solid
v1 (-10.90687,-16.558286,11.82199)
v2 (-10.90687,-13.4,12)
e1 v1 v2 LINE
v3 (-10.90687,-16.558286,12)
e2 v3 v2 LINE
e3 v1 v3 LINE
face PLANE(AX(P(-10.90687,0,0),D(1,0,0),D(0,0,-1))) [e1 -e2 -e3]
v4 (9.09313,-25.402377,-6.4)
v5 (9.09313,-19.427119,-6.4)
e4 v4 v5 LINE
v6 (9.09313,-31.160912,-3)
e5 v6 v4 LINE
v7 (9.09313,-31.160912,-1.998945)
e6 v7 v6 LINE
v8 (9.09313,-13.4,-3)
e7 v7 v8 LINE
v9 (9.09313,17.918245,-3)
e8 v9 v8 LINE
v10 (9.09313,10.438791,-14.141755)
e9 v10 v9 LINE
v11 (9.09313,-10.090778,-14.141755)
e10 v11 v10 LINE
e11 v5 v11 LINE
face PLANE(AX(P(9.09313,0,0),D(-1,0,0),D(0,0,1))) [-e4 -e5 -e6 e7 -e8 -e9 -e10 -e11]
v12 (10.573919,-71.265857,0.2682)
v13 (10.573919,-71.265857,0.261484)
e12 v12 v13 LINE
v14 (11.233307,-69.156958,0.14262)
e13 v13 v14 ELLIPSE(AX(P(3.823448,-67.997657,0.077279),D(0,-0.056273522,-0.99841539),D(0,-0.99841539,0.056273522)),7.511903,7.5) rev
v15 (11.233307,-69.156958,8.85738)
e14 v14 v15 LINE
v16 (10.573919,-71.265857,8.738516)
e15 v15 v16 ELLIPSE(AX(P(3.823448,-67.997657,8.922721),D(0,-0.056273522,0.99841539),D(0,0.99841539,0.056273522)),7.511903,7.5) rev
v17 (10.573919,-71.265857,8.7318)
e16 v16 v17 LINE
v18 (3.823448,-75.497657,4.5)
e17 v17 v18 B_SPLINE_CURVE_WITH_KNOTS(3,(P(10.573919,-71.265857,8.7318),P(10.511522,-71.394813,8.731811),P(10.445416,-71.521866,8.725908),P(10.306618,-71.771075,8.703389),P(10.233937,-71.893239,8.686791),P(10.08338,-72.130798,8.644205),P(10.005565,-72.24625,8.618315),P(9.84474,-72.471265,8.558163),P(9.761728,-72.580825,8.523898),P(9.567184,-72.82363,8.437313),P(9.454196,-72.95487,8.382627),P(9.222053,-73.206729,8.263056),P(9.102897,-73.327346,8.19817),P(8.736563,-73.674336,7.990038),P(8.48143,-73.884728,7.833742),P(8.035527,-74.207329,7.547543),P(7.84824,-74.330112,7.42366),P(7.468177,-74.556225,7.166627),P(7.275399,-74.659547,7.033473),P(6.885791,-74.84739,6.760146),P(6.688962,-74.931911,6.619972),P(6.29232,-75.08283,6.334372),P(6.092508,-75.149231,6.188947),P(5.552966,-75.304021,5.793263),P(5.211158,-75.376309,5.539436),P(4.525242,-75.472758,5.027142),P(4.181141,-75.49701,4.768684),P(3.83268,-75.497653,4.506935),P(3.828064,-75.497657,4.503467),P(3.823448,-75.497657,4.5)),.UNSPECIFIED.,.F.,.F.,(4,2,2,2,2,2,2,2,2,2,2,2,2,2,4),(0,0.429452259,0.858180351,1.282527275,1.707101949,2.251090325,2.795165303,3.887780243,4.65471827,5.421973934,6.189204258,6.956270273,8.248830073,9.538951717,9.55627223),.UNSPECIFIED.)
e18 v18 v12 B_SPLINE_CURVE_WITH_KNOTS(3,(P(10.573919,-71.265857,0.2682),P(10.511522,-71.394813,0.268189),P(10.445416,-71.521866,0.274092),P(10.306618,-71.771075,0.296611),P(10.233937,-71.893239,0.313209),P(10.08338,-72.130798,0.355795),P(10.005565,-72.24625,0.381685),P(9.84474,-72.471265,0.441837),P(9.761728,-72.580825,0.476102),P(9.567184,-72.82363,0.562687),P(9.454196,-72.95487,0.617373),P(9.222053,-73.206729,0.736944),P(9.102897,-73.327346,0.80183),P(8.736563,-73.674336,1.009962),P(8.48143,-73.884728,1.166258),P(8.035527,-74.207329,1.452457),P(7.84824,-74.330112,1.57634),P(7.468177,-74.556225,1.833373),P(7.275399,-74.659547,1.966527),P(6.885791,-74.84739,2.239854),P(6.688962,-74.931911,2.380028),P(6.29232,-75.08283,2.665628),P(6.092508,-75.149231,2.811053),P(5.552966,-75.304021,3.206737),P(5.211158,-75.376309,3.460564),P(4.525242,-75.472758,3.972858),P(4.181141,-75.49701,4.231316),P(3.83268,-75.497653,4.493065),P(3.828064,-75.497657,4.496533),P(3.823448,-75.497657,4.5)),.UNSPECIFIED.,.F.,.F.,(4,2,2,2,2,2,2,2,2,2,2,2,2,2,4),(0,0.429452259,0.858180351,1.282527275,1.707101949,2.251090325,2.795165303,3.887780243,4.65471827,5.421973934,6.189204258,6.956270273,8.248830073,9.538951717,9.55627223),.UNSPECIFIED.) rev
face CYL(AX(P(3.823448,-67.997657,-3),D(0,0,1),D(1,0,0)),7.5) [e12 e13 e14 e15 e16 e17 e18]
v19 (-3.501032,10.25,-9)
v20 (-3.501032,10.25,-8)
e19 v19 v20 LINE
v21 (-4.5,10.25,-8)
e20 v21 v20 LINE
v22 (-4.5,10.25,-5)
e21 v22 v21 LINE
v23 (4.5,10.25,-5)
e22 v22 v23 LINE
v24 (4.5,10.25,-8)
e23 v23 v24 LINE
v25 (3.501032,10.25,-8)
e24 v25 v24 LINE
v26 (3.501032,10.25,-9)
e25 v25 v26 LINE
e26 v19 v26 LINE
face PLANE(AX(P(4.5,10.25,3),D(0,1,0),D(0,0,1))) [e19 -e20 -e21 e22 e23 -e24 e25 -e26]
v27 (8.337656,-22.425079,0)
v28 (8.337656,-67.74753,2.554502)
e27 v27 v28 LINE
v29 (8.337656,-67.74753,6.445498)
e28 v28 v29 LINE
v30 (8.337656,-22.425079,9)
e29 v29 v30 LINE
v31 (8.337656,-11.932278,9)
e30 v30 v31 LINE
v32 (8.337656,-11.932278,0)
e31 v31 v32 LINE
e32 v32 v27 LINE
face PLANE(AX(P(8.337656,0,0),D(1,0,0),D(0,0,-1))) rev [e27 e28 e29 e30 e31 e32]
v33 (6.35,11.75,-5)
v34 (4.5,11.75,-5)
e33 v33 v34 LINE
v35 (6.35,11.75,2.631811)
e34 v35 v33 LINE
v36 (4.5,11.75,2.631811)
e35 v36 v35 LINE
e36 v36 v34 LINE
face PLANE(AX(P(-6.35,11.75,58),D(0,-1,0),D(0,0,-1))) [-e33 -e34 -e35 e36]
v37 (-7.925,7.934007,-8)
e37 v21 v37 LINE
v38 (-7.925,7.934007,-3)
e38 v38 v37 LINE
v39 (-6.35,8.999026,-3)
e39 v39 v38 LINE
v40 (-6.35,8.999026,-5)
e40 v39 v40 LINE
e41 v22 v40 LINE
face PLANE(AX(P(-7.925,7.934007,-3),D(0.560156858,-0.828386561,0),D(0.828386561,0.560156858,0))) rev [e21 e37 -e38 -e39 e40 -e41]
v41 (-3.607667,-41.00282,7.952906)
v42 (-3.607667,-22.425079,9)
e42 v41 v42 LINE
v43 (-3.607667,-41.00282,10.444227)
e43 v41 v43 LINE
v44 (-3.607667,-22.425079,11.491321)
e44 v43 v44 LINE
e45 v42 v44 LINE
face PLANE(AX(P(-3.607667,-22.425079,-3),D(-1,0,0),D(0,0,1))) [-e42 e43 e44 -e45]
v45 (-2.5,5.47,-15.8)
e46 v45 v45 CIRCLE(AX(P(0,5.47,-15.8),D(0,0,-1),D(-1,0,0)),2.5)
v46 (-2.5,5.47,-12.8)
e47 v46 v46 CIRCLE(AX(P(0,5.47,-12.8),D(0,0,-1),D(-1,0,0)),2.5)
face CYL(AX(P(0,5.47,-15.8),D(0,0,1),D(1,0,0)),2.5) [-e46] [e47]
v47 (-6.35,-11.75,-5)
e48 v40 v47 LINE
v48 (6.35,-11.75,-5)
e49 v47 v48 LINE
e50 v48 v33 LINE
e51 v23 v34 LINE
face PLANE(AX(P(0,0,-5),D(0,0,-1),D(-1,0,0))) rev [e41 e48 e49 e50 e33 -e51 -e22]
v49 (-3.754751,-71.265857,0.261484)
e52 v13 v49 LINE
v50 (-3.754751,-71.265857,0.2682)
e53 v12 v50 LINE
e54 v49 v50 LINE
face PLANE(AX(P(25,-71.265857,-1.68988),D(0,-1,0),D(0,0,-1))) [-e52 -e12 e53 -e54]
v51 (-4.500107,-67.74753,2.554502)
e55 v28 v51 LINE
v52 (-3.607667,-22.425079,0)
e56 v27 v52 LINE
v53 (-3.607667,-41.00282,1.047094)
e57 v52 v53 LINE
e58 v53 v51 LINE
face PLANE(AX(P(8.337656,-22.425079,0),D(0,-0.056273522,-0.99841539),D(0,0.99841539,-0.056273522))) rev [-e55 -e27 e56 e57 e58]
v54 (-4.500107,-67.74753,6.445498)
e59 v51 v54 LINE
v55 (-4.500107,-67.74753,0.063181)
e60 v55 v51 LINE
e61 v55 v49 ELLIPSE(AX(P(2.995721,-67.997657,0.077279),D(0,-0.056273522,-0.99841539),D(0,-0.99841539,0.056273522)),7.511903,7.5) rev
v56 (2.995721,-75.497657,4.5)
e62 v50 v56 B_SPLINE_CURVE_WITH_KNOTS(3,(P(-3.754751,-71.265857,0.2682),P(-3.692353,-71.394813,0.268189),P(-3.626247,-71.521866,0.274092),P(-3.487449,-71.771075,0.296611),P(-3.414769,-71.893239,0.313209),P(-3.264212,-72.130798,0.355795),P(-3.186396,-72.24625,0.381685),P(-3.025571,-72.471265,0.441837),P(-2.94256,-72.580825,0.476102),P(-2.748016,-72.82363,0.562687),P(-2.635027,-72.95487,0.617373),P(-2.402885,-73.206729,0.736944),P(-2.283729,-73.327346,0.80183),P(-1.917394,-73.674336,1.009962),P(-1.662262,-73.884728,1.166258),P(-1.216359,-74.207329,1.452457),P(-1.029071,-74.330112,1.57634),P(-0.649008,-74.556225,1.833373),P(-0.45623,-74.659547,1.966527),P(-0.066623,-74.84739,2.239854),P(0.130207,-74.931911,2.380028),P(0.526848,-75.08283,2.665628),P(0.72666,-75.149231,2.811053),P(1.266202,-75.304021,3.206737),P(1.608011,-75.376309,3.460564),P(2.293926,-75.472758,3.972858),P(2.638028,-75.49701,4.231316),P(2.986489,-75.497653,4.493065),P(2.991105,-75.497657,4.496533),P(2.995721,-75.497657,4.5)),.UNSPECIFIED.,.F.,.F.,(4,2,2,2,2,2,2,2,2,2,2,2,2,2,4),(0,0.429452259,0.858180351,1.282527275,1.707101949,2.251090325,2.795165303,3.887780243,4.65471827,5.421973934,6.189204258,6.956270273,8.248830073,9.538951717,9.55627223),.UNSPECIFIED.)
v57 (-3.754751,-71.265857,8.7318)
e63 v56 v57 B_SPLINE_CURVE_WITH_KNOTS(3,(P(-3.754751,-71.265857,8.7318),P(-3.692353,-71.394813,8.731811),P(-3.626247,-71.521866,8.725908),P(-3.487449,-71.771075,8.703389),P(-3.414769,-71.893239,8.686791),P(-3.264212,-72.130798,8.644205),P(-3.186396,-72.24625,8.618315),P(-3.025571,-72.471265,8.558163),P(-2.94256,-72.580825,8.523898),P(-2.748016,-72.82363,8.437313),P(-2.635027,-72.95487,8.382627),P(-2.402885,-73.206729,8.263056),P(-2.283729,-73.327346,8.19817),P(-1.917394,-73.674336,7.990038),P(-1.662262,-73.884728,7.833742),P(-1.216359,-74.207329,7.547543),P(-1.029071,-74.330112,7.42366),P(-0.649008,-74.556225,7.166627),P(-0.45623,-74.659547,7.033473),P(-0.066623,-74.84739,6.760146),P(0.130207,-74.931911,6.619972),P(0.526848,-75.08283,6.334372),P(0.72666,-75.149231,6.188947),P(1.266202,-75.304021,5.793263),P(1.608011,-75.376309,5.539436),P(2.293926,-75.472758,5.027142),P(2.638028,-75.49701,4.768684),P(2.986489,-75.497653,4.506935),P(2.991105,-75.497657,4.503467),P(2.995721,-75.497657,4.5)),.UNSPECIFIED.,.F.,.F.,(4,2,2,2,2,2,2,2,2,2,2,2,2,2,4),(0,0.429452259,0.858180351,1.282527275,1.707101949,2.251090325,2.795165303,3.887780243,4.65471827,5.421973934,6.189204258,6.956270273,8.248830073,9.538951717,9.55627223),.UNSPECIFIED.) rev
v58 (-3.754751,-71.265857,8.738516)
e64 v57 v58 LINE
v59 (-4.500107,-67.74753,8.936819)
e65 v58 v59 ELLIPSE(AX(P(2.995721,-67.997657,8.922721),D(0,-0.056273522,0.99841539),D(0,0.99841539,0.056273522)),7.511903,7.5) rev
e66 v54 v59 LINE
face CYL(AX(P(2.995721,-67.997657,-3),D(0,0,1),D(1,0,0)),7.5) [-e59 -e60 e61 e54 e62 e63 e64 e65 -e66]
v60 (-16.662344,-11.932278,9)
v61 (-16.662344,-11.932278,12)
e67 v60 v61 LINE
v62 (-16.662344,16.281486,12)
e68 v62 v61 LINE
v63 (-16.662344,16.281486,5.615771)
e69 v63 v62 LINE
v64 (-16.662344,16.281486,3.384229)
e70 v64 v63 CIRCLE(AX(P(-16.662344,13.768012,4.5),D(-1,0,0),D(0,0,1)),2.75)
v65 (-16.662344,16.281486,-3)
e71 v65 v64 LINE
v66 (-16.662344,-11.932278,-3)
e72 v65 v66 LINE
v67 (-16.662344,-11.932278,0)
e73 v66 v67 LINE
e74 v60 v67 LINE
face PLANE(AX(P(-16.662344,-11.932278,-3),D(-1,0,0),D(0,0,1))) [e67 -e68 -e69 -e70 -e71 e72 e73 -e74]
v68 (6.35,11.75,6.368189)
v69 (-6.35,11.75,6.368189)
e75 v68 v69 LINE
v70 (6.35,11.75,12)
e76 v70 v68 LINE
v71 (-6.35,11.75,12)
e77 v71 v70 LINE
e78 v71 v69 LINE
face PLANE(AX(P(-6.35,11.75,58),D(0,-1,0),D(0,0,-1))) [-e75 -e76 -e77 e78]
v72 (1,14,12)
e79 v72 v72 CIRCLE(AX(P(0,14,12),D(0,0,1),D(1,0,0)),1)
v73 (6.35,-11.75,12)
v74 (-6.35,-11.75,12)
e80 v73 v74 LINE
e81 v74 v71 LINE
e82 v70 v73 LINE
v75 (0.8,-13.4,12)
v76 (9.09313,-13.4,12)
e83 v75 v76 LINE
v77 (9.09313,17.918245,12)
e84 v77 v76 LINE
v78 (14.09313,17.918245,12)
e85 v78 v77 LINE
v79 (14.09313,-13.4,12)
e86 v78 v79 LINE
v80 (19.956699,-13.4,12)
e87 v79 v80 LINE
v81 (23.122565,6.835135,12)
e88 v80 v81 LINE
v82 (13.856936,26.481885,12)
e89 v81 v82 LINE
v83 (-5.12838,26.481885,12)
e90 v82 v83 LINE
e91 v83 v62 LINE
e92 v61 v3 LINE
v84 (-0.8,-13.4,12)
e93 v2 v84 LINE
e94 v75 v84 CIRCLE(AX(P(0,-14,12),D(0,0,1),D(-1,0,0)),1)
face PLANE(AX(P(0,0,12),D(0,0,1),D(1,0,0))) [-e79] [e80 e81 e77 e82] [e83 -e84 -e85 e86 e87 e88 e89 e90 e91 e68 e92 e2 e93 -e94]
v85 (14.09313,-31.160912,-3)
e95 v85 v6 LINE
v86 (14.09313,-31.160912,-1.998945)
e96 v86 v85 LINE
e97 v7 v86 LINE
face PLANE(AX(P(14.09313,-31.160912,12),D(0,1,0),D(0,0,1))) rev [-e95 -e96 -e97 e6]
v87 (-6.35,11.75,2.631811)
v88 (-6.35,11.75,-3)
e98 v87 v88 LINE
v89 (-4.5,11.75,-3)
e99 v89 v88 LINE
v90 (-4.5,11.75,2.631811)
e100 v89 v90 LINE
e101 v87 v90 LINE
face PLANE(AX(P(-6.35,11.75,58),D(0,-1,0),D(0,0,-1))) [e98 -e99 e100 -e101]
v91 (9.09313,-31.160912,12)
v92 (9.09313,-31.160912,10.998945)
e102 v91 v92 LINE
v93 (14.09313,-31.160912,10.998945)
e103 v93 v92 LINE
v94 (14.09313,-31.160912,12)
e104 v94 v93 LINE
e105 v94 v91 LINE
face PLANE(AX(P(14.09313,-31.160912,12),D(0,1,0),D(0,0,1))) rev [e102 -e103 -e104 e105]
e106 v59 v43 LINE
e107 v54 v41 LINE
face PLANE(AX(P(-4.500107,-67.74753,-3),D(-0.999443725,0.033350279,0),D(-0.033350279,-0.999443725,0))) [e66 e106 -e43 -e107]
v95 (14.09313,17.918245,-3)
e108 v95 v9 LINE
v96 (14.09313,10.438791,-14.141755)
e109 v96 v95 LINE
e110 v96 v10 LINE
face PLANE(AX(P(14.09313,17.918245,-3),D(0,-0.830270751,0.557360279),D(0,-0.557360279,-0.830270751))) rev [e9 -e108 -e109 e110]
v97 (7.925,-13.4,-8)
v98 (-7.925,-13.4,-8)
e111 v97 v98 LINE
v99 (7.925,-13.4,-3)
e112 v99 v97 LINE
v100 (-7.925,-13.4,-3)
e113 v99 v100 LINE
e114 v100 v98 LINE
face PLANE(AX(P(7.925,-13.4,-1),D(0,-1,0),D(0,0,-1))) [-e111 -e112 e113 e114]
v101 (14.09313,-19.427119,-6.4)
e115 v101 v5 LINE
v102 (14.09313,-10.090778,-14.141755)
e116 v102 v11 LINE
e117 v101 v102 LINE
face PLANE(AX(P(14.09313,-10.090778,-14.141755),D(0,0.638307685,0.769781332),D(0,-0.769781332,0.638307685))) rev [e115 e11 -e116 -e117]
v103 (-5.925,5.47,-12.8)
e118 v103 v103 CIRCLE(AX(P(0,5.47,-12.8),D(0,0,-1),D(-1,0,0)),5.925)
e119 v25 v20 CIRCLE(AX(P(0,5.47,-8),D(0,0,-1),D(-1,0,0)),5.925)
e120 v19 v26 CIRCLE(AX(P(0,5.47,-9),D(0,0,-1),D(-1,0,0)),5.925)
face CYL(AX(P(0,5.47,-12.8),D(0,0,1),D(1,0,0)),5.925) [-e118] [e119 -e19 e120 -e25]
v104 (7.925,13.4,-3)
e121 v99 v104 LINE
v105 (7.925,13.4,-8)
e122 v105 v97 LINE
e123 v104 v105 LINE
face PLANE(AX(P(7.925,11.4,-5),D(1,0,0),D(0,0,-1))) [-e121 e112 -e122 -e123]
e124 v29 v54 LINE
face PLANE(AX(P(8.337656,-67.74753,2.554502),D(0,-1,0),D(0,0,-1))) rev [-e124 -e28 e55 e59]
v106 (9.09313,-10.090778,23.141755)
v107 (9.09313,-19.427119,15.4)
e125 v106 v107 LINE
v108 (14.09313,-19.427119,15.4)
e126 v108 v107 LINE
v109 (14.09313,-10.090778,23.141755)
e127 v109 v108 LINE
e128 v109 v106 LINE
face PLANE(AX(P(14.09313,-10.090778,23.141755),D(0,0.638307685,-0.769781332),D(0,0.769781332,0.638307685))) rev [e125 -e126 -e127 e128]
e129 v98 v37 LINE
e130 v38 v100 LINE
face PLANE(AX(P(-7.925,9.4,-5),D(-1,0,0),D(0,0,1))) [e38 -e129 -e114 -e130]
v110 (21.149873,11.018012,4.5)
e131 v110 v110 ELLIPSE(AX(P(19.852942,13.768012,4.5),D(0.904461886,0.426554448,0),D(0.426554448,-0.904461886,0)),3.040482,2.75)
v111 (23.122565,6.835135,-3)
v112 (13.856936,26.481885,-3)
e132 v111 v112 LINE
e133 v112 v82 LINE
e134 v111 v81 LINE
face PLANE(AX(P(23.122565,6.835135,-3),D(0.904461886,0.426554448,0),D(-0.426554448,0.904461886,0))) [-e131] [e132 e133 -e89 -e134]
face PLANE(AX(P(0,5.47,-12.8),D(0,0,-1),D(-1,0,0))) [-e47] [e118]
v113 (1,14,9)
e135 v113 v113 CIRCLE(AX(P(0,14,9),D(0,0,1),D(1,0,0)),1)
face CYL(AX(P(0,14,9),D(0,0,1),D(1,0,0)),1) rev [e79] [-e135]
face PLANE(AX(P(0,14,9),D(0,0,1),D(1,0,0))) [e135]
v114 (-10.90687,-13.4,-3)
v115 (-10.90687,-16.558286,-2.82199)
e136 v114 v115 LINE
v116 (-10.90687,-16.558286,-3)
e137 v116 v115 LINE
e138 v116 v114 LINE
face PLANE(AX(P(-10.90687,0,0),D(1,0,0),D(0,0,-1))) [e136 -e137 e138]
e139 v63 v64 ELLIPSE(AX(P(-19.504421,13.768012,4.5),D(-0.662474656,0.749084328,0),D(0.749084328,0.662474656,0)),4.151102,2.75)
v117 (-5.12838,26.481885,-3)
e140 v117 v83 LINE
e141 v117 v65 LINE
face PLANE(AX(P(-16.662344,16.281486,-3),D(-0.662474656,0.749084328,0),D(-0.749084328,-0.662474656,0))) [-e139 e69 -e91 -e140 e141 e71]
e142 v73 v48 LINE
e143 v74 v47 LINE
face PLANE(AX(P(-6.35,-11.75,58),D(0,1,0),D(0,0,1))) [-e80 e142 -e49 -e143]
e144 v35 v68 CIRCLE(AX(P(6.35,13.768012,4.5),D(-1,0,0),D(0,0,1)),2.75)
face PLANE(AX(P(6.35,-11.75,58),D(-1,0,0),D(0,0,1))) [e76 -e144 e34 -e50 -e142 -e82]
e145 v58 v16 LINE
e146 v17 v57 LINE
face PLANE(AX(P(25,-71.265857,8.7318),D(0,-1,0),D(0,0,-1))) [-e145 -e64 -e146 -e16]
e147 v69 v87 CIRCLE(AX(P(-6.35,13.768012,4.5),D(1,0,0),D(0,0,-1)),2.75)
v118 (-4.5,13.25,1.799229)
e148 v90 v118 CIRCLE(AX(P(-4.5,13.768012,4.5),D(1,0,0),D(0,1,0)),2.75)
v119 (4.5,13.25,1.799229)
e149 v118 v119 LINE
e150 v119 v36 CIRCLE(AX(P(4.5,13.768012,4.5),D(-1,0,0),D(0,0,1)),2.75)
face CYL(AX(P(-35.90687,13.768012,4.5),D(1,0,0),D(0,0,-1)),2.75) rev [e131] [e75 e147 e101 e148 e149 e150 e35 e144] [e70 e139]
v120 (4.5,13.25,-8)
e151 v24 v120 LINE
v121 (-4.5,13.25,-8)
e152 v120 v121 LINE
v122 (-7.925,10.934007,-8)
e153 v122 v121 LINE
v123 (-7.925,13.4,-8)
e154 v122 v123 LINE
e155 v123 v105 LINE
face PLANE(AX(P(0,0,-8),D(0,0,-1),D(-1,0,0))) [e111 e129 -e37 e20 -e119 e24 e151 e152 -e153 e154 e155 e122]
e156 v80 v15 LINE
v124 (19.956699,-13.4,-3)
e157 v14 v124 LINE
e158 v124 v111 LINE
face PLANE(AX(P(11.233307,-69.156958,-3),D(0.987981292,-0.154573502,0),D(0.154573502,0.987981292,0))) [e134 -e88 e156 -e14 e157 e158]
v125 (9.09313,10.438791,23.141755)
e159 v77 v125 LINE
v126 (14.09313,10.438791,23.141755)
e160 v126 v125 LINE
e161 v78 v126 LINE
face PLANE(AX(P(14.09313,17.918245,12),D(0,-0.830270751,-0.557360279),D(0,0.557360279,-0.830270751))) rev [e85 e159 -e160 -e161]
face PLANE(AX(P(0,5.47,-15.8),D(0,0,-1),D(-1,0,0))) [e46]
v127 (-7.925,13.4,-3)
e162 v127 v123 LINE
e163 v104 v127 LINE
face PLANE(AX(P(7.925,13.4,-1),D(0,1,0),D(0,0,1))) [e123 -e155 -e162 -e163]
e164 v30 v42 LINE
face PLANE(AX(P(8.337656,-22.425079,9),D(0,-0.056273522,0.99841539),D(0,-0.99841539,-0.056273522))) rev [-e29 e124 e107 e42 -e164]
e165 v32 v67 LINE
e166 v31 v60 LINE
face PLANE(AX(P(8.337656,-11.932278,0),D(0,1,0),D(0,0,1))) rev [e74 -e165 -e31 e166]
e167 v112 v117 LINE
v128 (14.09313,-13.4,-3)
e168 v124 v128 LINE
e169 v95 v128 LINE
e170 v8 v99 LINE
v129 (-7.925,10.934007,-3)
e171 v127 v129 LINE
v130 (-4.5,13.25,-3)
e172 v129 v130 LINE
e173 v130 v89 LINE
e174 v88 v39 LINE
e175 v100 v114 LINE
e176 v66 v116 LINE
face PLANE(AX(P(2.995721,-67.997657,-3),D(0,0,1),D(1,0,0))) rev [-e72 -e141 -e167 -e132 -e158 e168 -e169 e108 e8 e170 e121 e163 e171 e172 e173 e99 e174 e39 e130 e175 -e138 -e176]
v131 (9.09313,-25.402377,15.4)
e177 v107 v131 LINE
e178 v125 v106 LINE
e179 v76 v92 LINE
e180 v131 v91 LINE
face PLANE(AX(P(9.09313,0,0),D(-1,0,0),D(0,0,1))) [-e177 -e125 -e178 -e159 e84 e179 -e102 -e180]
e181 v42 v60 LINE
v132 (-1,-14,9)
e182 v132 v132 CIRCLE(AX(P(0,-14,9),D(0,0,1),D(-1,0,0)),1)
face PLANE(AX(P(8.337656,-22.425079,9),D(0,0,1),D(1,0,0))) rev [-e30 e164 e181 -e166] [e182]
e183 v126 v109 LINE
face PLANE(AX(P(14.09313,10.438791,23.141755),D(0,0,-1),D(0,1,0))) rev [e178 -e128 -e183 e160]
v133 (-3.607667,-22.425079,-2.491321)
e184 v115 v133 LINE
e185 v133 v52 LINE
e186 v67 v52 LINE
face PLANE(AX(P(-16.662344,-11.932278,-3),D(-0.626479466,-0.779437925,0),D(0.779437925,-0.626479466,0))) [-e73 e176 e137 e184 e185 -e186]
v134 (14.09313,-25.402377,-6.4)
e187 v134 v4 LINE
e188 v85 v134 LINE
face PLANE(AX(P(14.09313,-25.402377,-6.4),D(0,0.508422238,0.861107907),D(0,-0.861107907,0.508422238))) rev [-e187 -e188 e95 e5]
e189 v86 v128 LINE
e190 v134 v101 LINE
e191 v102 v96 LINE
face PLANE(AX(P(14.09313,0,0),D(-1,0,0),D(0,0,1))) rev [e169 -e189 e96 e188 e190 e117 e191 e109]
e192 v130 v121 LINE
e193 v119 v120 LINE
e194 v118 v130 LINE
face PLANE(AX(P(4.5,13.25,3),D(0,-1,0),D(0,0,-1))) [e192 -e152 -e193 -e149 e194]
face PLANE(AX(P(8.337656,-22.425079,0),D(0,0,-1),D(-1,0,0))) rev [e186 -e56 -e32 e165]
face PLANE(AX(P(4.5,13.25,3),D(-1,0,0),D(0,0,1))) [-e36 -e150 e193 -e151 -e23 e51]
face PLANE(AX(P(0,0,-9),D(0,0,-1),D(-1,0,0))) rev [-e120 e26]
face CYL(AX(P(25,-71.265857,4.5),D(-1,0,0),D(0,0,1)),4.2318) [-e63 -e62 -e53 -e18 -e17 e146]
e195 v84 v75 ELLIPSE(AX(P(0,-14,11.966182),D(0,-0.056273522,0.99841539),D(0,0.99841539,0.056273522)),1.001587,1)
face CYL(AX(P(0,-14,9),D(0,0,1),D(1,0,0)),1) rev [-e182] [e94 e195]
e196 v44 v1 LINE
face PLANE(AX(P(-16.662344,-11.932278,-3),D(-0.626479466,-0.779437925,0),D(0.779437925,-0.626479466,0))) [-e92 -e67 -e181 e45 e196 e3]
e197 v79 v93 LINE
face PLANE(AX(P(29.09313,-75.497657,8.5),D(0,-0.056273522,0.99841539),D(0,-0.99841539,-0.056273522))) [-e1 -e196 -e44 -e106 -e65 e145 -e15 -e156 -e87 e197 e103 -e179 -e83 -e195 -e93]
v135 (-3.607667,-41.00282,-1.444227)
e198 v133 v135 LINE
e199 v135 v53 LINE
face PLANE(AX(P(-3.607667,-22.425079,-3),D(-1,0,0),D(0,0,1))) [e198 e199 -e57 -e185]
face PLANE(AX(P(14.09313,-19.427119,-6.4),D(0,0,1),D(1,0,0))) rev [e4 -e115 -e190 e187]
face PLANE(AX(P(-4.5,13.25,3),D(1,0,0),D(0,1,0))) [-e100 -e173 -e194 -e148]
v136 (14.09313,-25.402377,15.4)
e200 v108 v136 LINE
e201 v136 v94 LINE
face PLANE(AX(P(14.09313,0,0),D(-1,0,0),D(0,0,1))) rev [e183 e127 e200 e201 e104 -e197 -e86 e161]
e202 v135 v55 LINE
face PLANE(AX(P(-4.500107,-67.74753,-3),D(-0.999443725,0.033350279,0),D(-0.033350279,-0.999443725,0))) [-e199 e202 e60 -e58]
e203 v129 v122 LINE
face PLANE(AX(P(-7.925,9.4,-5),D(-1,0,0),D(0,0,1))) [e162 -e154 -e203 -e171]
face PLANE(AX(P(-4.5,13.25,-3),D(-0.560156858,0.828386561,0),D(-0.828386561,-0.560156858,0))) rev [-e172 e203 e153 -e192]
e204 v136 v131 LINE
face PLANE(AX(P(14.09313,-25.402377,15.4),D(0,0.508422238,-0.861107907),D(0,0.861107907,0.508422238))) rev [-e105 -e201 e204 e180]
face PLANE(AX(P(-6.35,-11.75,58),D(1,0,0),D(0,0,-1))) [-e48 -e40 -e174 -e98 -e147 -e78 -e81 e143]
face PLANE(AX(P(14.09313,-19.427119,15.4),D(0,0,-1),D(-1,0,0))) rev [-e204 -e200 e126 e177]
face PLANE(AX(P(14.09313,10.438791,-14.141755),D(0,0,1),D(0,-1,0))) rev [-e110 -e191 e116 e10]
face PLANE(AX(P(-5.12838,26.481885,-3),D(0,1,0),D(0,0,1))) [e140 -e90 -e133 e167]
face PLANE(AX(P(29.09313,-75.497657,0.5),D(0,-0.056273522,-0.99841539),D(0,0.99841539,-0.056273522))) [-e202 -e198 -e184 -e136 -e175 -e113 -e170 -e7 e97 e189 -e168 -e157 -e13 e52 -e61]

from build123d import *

# Parameters (mm, degrees)
SKETCH1_R                = 15
SKETCH1_W                = 14.5
SKETCH1_H                = 22.8
BOSS_EXTRUDE1_DEPTH      = 12
CUT_EXTRUDE1_DEPTH       = 24
BOSS_EXTRUDE2_START      = -12
BOSS_EXTRUDE2_DEPTH      = 12
FILLET1_R                = 5
FILLET2_R                = 5
BOSS_EXTRUDE4_DEPTH      = 12
BOSS_EXTRUDE7_DEPTH      = 10
SKETCH9_R                = 7.25
BOSS_EXTRUDE9_DEPTH      = 6.6
SKETCH10_R               = 2.5
BOSS_EXTRUDE10_DEPTH     = 3
FILLET3_R                = 10
FILLET5_R                = 10
SKETCH11_W               = 2.40686952
SKETCH11_H               = 3
SKETCH11_W_2             = 3
SKETCH11_H_2             = 2.40686952
CUT_EXTRUDE2_DEPTH       = 10
SKETCH13_W               = 18.18626096
SKETCH13_H               = 26.685750205
BOSS_EXTRUDE11_DEPTH     = 3.6
SKETCH15_W               = 18.18626096
SKETCH15_H               = 26.685750205
SKETCH15_W_2             = 14.5
SKETCH15_H_2             = 22.8
BOSS_EXTRUDE12_DEPTH     = 13.6
SKETCH17_W               = 88.544213988
SKETCH17_H               = 130.772992967
SKETCH17_W_2             = 18.18626096
SKETCH17_H_2             = 26.685750205
CUT_EXTRUDE3_DEPTH       = 13.6
BOSS_EXTRUDE16_DEPTH     = 15
CUT_EXTRUDE6_DEPTH       = 20
CUT_EXTRUDE6_DEPTH_BACK  = 20
BOSS_EXTRUDE17_DEPTH     = 5
CUT_EXTRUDE7_DEPTH       = 25
CUT_EXTRUDE7_DEPTH_BACK  = 15
SKETCH25_W               = 14.18626096
SKETCH25_H               = 22.685750205
CUT_EXTRUDE8_DEPTH       = 20
SKETCH26_R               = 1
CUT_EXTRUDE9_DEPTH       = 3
CUT_EXTRUDE12_DEPTH      = 25
SKETCH29_W               = 13.770233496
SKETCH29_H               = 29.611444499
CUT_EXTRUDE13_DEPTH      = 48
SKETCH30_W               = 12
SKETCH30_H               = 22.8
CUT_EXTRUDE14_DEPTH      = 48
SKETCH32_W               = 2
SKETCH32_H               = 22.8
BOSS_EXTRUDE23_DEPTH     = 17
SKETCH33_W               = 15.85
SKETCH33_H               = 2
BOSS_EXTRUDE24_DEPTH     = 4
SKETCH34_W               = 15.85
SKETCH34_H               = 26.8
BOSS_EXTRUDE25_DEPTH     = 3
SKETCH35_R               = 5.925
BOSS_EXTRUDE26_DEPTH     = 4.8
SKETCH36_R               = 2.5
BOSS_EXTRUDE27_DEPTH     = 3
SKETCH37_W               = 12.7
SKETCH37_H               = 23.5
CUT_EXTRUDE15_DEPTH      = 63
CUT_EXTRUDE16_DEPTH      = 8
CUT_EXTRUDE16_DEPTH_BACK = 4
SKETCH38_W               = 9
SKETCH38_H               = 3
CUT_EXTRUDE17_DEPTH      = 5
CUT_EXTRUDE18_DEPTH      = 31
CUT_EXTRUDE18_DEPTH_BACK = 50
SKETCH40_R               = 2.75


# Read off the part's stored shape, not the designer's step: Boss-Extrude2
with BuildPart() as part:
    # Sketch1 → Boss-Extrude1 (new body)
    # profile 1 of 2: a face of its own
    with BuildSketch(Plane.XY):
        Circle(SKETCH1_R)
        Rectangle(SKETCH1_W, SKETCH1_H, mode=Mode.SUBTRACT)
    # profile 2 of 2: a face of its own
    with BuildSketch(Plane.XY):
        with BuildLine():
            Line((34.889014039, -14.726662295), (10.829823077, 10.378580449))
            ThreePointArc((10.829823077, 10.378580449), (13.918465184, 5.5925242), (15, 0))
            ThreePointArc((15, 0), (8.274705986, -12.511164648), (-5.870565447, -13.803494533))
            Line((-5.870565447, -13.803494533), (11.720818789, -21.285032793))
            Line((11.720818789, -21.285032793), (7.17598603, -56.938690475))
            Line((7.17598603, -56.938690475), (22.17598603, -56.938690475))
            Line((22.17598603, -56.938690475), (34.889014039, -14.726662295))
        make_face()
    extrude(amount=BOSS_EXTRUDE1_DEPTH)

    # Sketch4 → Cut-Extrude1 (cut)
    with BuildSketch(Plane.XY.offset(12)):
        Polygon((25.908479053, -5.355669266), (45.608770936, -16.450233145), (32.401525551, -58.978549805), (15.005502416, -56.938690475), align=None)
    extrude(amount=-CUT_EXTRUDE1_DEPTH, mode=Mode.SUBTRACT)

    # Boss-Extrude2 outline → Boss-Extrude2 (add)
    with BuildSketch(Plane.XY.offset(12).offset(BOSS_EXTRUDE2_START)):
        with BuildLine():
            Line((5.606806504, -22.40394756), (1.154595891, -56.938690475))
            Line((1.154595891, -56.938690475), (7.17598603, -56.938690475))
            Line((7.17598603, -56.938690475), (11.720818789, -21.285032793))
            Line((11.720818789, -21.285032793), (-5.870565447, -13.803494533))
            ThreePointArc((-5.870565447, -13.803494533), (-7.327726293, -13.088331726), (-8.699078631, -12.219903066))
            Line((-8.699078631, -12.219903066), (5.606806504, -22.40394756))
        make_face()
    extrude(amount=BOSS_EXTRUDE2_DEPTH)

    # Fillet1
    fillet1_edges = [part.edges().sort_by_distance(p)[0] for p in [
        (1.154595891, -56.938690475, 6),
    ]]
    fillet(fillet1_edges, radius=FILLET1_R)

    # Fillet2
    fillet2_edges = [part.edges().sort_by_distance(p)[0] for p in [
        (15.005502416, -56.938690475, 6),
    ]]
    fillet(fillet2_edges, radius=FILLET2_R)

    # Sketch5 → Boss-Extrude4 (add)
    with BuildSketch(Plane(origin=(0, 0, 0), x_dir=(-1, 0, 0), z_dir=(0, 0, -1))):
        with BuildLine():
            Line((-2.448312302, -26.293012267), (11.598771509, -16.293204089))
            ThreePointArc((11.598771509, -16.293204089), (15.246223493, 12.944213735), (-14.195603849, 14.088464479))
            Line((-14.195603849, 14.088464479), (-32.784425655, -4.641720828))
            Line((-32.784425655, -4.641720828), (-16.822475194, -80.159229174))
            Line((-16.822475194, -80.159229174), (4.496107211, -80.159229174))
            Line((4.496107211, -80.159229174), (-2.448312302, -26.293012267))
        make_face()
        with BuildLine():
            Line((-25.908479053, -5.355669266), (-10.829823077, 10.378580449))
            ThreePointArc((-10.829823077, 10.378580449), (11.349356029, 9.807758038), (8.699078632, -12.219903067))
            Line((8.699078631, -12.219903066), (-5.606806504, -22.40394756))
            Line((-5.606806504, -22.40394756), (-1.88161409, -51.29938255))
            ThreePointArc((-1.88161409, -51.29938255), (-3.085807921, -55.240467298), (-6.8405742, -56.938690475))
            Line((-6.8405742, -56.938690475), (-10.951869916, -56.938690475))
            ThreePointArc((-10.951869916, -56.938690475), (-14.100682132, -55.822629407), (-15.843787659, -52.972683126))
            Line((-15.843787659, -52.972683126), (-25.908479053, -5.355669266))
        make_face(mode=Mode.SUBTRACT)
    extrude(amount=-BOSS_EXTRUDE4_DEPTH)

    # Sketch6 → Boss-Extrude7 (add)
    with BuildSketch(Plane(origin=(0, 0, 0), x_dir=(-1, 0, 0), z_dir=(0, 0, -1))):
        Polygon((-11.5, 2.65), (-7.25, 2.65), (-7.25, 4.15), (-7.25, 5.65), (-11.5, 5.65), align=None)
        with BuildLine():
            Line((-7.25, 2.65), (-7.09313048, 2.65))
            ThreePointArc((-7.09313048, 2.65), (-7.210675973, 3.395909812), (-7.25, 4.15))
            Line((-7.25, 4.15), (-7.25, 2.65))
        make_face()
        with BuildLine():
            Line((-7.25, 5.65), (-7.25, 4.15))
            ThreePointArc((-7.25, 4.15), (-7.210675973, 4.904090188), (-7.09313048, 5.65))
            Line((-7.09313048, 5.65), (-7.25, 5.65))
        make_face()
        Polygon((0, 11.4), (1.5, 11.4), (1.5, 15.65), (-1.5, 15.65), (-1.5, 11.4), align=None)
        with BuildLine():
            Line((-1.5, 11.4), (-1.5, 11.24313048))
            ThreePointArc((-1.5, 11.24313048), (-0.754090188, 11.360675973), (0, 11.4))
            Line((0, 11.4), (-1.5, 11.4))
        make_face()
        with BuildLine():
            ThreePointArc((0, 11.4), (0.754090188, 11.360675973), (1.5, 11.24313048))
            Line((1.5, 11.24313048), (1.5, 11.4))
            Line((1.5, 11.4), (0, 11.4))
        make_face()
        Polygon((7.25, 4.15), (7.25, 2.65), (11.5, 2.65), (11.5, 5.65), (7.25, 5.65), align=None)
        with BuildLine():
            ThreePointArc((7.09313048, 5.65), (7.210675973, 4.904090188), (7.25, 4.15))
            Line((7.25, 4.15), (7.25, 5.65))
            Line((7.25, 5.65), (7.09313048, 5.65))
        make_face()
        with BuildLine():
            ThreePointArc((7.25, 4.15), (7.210675973, 3.395909812), (7.09313048, 2.65))
            Line((7.09313048, 2.65), (7.25, 2.65))
            Line((7.25, 2.65), (7.25, 4.15))
        make_face()
    extrude(amount=BOSS_EXTRUDE7_DEPTH)

    # Sketch9 → Boss-Extrude9 (add)
    with BuildSketch(Plane(origin=(0, 0, -6.4), x_dir=(-1, 0, 0), z_dir=(0, 0, -1))):
        with Locations(Location((0, 4.15, 0), (0, 0, 168.059456039))):
            Circle(SKETCH9_R)
    extrude(amount=BOSS_EXTRUDE9_DEPTH)

    # Sketch10 → Boss-Extrude10 (add)
    with BuildSketch(Plane(origin=(0, 0, -13), x_dir=(-1, 0, 0), z_dir=(0, 0, -1))):
        with Locations((0, 4.15)):
            Circle(SKETCH10_R)
    extrude(amount=BOSS_EXTRUDE10_DEPTH)

    # Fillet3
    fillet3_edges = [part.edges().sort_by_distance(p)[0] for p in [
        (-4.496107211, -80.159229174, 6),
    ]]
    fillet(fillet3_edges, radius=FILLET3_R)

    # Fillet5
    fillet5_edges = [part.edges().sort_by_distance(p)[0] for p in [
        (16.822475194, -80.159229174, 6),
    ]]
    fillet(fillet5_edges, radius=FILLET5_R)

    # Sketch11 → Cut-Extrude2 (cut)
    with BuildSketch(Plane(origin=(0, 0, -10), x_dir=(-1, 0, 0), z_dir=(0, 0, -1))):
        with Locations((10.29656524, 4.15)):
            Rectangle(SKETCH11_W, SKETCH11_H)
        with Locations((-10.29656524, 4.15)):
            Rectangle(SKETCH11_W, SKETCH11_H)
        with Locations((0, 14.44656524)):
            Rectangle(SKETCH11_W_2, SKETCH11_H_2)
    extrude(amount=-CUT_EXTRUDE2_DEPTH, mode=Mode.SUBTRACT)

    # Sketch13 → Boss-Extrude11 (add)
    with BuildSketch(Plane(origin=(0, 0, -10), x_dir=(-1, 0, 0), z_dir=(0, 0, -1))):
        with Locations((0, -0.057124897)):
            Rectangle(SKETCH13_W, SKETCH13_H)
    extrude(amount=-BOSS_EXTRUDE11_DEPTH)

    # Sketch15 → Boss-Extrude12 (add)
    with BuildSketch(Plane(origin=(0, 0, -10), x_dir=(-1, 0, 0), z_dir=(0, 0, -1))):
        with Locations((0, -0.057124897)):
            Rectangle(SKETCH15_W, SKETCH15_H)
        Rectangle(SKETCH15_W_2, SKETCH15_H_2, mode=Mode.SUBTRACT)
    extrude(amount=-BOSS_EXTRUDE12_DEPTH)

    # Sketch17 → Cut-Extrude3 (cut)
    with BuildSketch(Plane(origin=(0, 0, 0), x_dir=(-1, 0, 0), z_dir=(0, 0, -1))):
        with Locations((-15.076356892, -26.777764381)):
            Rectangle(SKETCH17_W, SKETCH17_H)
        with Locations((0, -0.057124897)):
            Rectangle(SKETCH17_W_2, SKETCH17_H_2, mode=Mode.SUBTRACT)
    extrude(amount=-CUT_EXTRUDE3_DEPTH, mode=Mode.SUBTRACT)

    # Sketch18 → Boss-Extrude16 (add)
    with BuildSketch(Plane.XY.offset(12)):
        with BuildLine():
            Line((11.233307191, -69.15695845), (23.12256473, 6.835135095))
            Line((23.12256473, 6.835135095), (13.856935522, 26.481884794))
            Line((13.856935522, 26.481884794), (-5.128379784, 26.481884794))
            Line((-5.128379784, 26.481884794), (-16.662343589, 16.28148622))
            Line((-16.662343589, 16.28148622), (-16.662343589, -11.932277882))
            Line((-16.662343589, -11.932277882), (-3.607666978, -22.42507862))
            Line((-3.607666978, -22.42507862), (-3.607666978, -41.0028204))
            Line((-3.607666978, -41.0028204), (-4.500106941, -67.747530096))
            ThreePointArc((-4.500106941, -67.747530096), (-2.395287871, -73.211774888), (2.995720994, -75.497657186))
            Line((2.995720994, -75.497657186), (3.823447504, -75.497657186))
            ThreePointArc((3.823447504, -75.497657186), (8.699677632, -73.696111339), (11.233307191, -69.15695845))
        make_face()
    extrude(amount=-BOSS_EXTRUDE16_DEPTH)

    # Sketch22 → Cut-Extrude6 (cut, two sides: drawn at the far end of the back side and taken through both)
    with BuildSketch(Plane(origin=(9.09313048, 0, 0), x_dir=(0, 0, -1), z_dir=(1, 0, 0)).offset(-CUT_EXTRUDE6_DEPTH_BACK)):
        Polygon((-0.5, -75.497657186), (-8.5, -75.497657186), (-12, -13.4), (-17.601804557, -13.4), (-17.601804557, -86.596912876), (8.601804557, -86.596912876), (8.601804557, -13.4), (3, -13.4), align=None)
    extrude(amount=CUT_EXTRUDE6_DEPTH + CUT_EXTRUDE6_DEPTH_BACK, mode=Mode.SUBTRACT)

    # Sketch20 → Boss-Extrude17 (add)
    with BuildSketch(Plane(origin=(9.09313048, 0, 0), x_dir=(0, 0, -1), z_dir=(1, 0, 0))):
        Polygon((3, 17.918244511), (14.141754599, 10.438791043), (14.141754599, -10.090778273), (6.4, -19.427119201), (6.4, -25.402377395), (3, -31.160911677), (-12, -31.160911677), (-15.4, -25.402377395), (-15.4, -19.427119201), (-23.141754599, -10.090778273), (-23.141754599, 10.438791043), (-12, 17.918244511), align=None)
    extrude(amount=BOSS_EXTRUDE17_DEPTH)

    # Sketch24 → Cut-Extrude7 (cut, two sides: drawn at the far end of the back side and taken through both)
    with BuildSketch(Plane(origin=(0, 0, 0), x_dir=(0, 0, -1), z_dir=(1, 0, 0)).offset(-CUT_EXTRUDE7_DEPTH_BACK)):
        with BuildLine():
            Line((-8.73179984, -71.265857346), (-10.447221895, -71.265857346))
            Line((-10.447221895, -71.265857346), (-10.447221895, -79.091973424))
            Line((-10.447221895, -79.091973424), (1.689879503, -79.091973424))
            Line((1.689879503, -79.091973424), (1.689879503, -71.265857346))
            Line((1.689879503, -71.265857346), (-0.26820016, -71.265857346))
            ThreePointArc((-0.26820016, -71.265857346), (-4.5, -75.497657186), (-8.73179984, -71.265857346))
        make_face()
    extrude(amount=CUT_EXTRUDE7_DEPTH + CUT_EXTRUDE7_DEPTH_BACK, mode=Mode.SUBTRACT)

    # Sketch25 → Cut-Extrude8 (cut)
    with BuildSketch(Plane.XY.offset(12)):
        with Locations((0, -0.057124897)):
            Rectangle(SKETCH25_W, SKETCH25_H)
    extrude(amount=-CUT_EXTRUDE8_DEPTH, mode=Mode.SUBTRACT)

    # Sketch26 → Cut-Extrude9 (cut)
    with BuildSketch(Plane.XY.offset(12)):
        with Locations((0, 14)):
            Circle(SKETCH26_R)
        with Locations(Location((0, -14, 0), (0, 0, 36.869897646))):
            Circle(SKETCH26_R)
    extrude(amount=-CUT_EXTRUDE9_DEPTH, mode=Mode.SUBTRACT)

    # Sketch27 → Cut-Extrude12 (cut)
    with BuildSketch(Plane.ZY.offset(16.662343589)):
        Polygon((0, -22.42507862), (2.55450185, -67.747530096), (6.44549815, -67.747530096), (9, -22.42507862), (9, -11.932277882), (0, -11.932277882), align=None)
    extrude(amount=-CUT_EXTRUDE12_DEPTH, mode=Mode.SUBTRACT)

    # Sketch29 → Cut-Extrude13 (cut)
    with BuildSketch(Plane.ZY.offset(-9.09313048)):
        with Locations((-9.885116748, -0.309323441)):
            Rectangle(SKETCH29_W, SKETCH29_H)
    extrude(amount=CUT_EXTRUDE13_DEPTH, mode=Mode.SUBTRACT)

    # Sketch30 → Cut-Extrude14 (cut)
    with BuildSketch(Plane.XY.offset(12)):
        Rectangle(SKETCH30_W, SKETCH30_H)
    extrude(amount=-CUT_EXTRUDE14_DEPTH, mode=Mode.SUBTRACT)

    # Sketch32 → Boss-Extrude23 (add)
    with BuildSketch(Plane.XY.offset(12)):
        Polygon((-5.925, 11.4), (-7.925, 11.4), (-7.925, 9.4), (-7.925, -11.4), (-5.925, -11.4), align=None)
        with Locations((6.925, 0)):
            Rectangle(SKETCH32_W, SKETCH32_H)
    extrude(amount=-BOSS_EXTRUDE23_DEPTH)

    # Sketch33 → Boss-Extrude24 (add)
    with BuildSketch(Plane(origin=(0, 0, -5), x_dir=(-1, 0, 0), z_dir=(0, 0, -1))):
        with Locations((0, 12.4)):
            Rectangle(SKETCH33_W, SKETCH33_H)
        with Locations((0, -12.4)):
            Rectangle(SKETCH33_W, SKETCH33_H)
    extrude(amount=-BOSS_EXTRUDE24_DEPTH)

    # Sketch34 → Boss-Extrude25 (add)
    with BuildSketch(Plane(origin=(0, 0, -5), x_dir=(-1, 0, 0), z_dir=(0, 0, -1))):
        Rectangle(SKETCH34_W, SKETCH34_H)
    extrude(amount=BOSS_EXTRUDE25_DEPTH)

    # Sketch35 → Boss-Extrude26 (add)
    with BuildSketch(Plane(origin=(0, 0, -8), x_dir=(-1, 0, 0), z_dir=(0, 0, -1))):
        with Locations((0, 5.47)):
            Circle(SKETCH35_R)
    extrude(amount=BOSS_EXTRUDE26_DEPTH)

    # Sketch36 → Boss-Extrude27 (add)
    with BuildSketch(Plane(origin=(0, 0, -12.8), x_dir=(-1, 0, 0), z_dir=(0, 0, -1))):
        with Locations((0, 5.47)):
            Circle(SKETCH36_R)
    extrude(amount=BOSS_EXTRUDE27_DEPTH)

    # Sketch37 → Cut-Extrude15 (cut)
    with BuildSketch(Plane.XY.offset(-5)):
        Rectangle(SKETCH37_W, SKETCH37_H)
    extrude(amount=CUT_EXTRUDE15_DEPTH, mode=Mode.SUBTRACT)

    # Sketch38 → Cut-Extrude16 (cut, two sides: drawn at the far end of the back side and taken through both)
    with BuildSketch(Plane.XY.offset(-5).offset(-CUT_EXTRUDE16_DEPTH_BACK)):
        with Locations((0, 11.75)):
            Rectangle(SKETCH38_W, SKETCH38_H)
    extrude(amount=CUT_EXTRUDE16_DEPTH + CUT_EXTRUDE16_DEPTH_BACK, mode=Mode.SUBTRACT)

    # Sketch39 → Cut-Extrude17 (cut)
    with BuildSketch(Plane(origin=(0, 0, -8), x_dir=(-1, 0, 0), z_dir=(0, 0, -1))):
        Polygon((4.5, 13.25), (7.925, 10.934007287), (7.925, 7.934007287), (4.5, 10.25), align=None)
    extrude(amount=-CUT_EXTRUDE17_DEPTH, mode=Mode.SUBTRACT)

    # Sketch40 → Cut-Extrude18 (cut, two sides: drawn at the far end of the back side and taken through both)
    with BuildSketch(Plane(origin=(14.09313048, 0, 0), x_dir=(0, 0, -1), z_dir=(1, 0, 0)).offset(-CUT_EXTRUDE18_DEPTH_BACK)):
        with Locations(Location((-4.5, 13.768011552, 0), (0, 0, 66.062809756))):
            Circle(SKETCH40_R)
    extrude(amount=CUT_EXTRUDE18_DEPTH + CUT_EXTRUDE18_DEPTH_BACK, mode=Mode.SUBTRACT)


solid = part.part
